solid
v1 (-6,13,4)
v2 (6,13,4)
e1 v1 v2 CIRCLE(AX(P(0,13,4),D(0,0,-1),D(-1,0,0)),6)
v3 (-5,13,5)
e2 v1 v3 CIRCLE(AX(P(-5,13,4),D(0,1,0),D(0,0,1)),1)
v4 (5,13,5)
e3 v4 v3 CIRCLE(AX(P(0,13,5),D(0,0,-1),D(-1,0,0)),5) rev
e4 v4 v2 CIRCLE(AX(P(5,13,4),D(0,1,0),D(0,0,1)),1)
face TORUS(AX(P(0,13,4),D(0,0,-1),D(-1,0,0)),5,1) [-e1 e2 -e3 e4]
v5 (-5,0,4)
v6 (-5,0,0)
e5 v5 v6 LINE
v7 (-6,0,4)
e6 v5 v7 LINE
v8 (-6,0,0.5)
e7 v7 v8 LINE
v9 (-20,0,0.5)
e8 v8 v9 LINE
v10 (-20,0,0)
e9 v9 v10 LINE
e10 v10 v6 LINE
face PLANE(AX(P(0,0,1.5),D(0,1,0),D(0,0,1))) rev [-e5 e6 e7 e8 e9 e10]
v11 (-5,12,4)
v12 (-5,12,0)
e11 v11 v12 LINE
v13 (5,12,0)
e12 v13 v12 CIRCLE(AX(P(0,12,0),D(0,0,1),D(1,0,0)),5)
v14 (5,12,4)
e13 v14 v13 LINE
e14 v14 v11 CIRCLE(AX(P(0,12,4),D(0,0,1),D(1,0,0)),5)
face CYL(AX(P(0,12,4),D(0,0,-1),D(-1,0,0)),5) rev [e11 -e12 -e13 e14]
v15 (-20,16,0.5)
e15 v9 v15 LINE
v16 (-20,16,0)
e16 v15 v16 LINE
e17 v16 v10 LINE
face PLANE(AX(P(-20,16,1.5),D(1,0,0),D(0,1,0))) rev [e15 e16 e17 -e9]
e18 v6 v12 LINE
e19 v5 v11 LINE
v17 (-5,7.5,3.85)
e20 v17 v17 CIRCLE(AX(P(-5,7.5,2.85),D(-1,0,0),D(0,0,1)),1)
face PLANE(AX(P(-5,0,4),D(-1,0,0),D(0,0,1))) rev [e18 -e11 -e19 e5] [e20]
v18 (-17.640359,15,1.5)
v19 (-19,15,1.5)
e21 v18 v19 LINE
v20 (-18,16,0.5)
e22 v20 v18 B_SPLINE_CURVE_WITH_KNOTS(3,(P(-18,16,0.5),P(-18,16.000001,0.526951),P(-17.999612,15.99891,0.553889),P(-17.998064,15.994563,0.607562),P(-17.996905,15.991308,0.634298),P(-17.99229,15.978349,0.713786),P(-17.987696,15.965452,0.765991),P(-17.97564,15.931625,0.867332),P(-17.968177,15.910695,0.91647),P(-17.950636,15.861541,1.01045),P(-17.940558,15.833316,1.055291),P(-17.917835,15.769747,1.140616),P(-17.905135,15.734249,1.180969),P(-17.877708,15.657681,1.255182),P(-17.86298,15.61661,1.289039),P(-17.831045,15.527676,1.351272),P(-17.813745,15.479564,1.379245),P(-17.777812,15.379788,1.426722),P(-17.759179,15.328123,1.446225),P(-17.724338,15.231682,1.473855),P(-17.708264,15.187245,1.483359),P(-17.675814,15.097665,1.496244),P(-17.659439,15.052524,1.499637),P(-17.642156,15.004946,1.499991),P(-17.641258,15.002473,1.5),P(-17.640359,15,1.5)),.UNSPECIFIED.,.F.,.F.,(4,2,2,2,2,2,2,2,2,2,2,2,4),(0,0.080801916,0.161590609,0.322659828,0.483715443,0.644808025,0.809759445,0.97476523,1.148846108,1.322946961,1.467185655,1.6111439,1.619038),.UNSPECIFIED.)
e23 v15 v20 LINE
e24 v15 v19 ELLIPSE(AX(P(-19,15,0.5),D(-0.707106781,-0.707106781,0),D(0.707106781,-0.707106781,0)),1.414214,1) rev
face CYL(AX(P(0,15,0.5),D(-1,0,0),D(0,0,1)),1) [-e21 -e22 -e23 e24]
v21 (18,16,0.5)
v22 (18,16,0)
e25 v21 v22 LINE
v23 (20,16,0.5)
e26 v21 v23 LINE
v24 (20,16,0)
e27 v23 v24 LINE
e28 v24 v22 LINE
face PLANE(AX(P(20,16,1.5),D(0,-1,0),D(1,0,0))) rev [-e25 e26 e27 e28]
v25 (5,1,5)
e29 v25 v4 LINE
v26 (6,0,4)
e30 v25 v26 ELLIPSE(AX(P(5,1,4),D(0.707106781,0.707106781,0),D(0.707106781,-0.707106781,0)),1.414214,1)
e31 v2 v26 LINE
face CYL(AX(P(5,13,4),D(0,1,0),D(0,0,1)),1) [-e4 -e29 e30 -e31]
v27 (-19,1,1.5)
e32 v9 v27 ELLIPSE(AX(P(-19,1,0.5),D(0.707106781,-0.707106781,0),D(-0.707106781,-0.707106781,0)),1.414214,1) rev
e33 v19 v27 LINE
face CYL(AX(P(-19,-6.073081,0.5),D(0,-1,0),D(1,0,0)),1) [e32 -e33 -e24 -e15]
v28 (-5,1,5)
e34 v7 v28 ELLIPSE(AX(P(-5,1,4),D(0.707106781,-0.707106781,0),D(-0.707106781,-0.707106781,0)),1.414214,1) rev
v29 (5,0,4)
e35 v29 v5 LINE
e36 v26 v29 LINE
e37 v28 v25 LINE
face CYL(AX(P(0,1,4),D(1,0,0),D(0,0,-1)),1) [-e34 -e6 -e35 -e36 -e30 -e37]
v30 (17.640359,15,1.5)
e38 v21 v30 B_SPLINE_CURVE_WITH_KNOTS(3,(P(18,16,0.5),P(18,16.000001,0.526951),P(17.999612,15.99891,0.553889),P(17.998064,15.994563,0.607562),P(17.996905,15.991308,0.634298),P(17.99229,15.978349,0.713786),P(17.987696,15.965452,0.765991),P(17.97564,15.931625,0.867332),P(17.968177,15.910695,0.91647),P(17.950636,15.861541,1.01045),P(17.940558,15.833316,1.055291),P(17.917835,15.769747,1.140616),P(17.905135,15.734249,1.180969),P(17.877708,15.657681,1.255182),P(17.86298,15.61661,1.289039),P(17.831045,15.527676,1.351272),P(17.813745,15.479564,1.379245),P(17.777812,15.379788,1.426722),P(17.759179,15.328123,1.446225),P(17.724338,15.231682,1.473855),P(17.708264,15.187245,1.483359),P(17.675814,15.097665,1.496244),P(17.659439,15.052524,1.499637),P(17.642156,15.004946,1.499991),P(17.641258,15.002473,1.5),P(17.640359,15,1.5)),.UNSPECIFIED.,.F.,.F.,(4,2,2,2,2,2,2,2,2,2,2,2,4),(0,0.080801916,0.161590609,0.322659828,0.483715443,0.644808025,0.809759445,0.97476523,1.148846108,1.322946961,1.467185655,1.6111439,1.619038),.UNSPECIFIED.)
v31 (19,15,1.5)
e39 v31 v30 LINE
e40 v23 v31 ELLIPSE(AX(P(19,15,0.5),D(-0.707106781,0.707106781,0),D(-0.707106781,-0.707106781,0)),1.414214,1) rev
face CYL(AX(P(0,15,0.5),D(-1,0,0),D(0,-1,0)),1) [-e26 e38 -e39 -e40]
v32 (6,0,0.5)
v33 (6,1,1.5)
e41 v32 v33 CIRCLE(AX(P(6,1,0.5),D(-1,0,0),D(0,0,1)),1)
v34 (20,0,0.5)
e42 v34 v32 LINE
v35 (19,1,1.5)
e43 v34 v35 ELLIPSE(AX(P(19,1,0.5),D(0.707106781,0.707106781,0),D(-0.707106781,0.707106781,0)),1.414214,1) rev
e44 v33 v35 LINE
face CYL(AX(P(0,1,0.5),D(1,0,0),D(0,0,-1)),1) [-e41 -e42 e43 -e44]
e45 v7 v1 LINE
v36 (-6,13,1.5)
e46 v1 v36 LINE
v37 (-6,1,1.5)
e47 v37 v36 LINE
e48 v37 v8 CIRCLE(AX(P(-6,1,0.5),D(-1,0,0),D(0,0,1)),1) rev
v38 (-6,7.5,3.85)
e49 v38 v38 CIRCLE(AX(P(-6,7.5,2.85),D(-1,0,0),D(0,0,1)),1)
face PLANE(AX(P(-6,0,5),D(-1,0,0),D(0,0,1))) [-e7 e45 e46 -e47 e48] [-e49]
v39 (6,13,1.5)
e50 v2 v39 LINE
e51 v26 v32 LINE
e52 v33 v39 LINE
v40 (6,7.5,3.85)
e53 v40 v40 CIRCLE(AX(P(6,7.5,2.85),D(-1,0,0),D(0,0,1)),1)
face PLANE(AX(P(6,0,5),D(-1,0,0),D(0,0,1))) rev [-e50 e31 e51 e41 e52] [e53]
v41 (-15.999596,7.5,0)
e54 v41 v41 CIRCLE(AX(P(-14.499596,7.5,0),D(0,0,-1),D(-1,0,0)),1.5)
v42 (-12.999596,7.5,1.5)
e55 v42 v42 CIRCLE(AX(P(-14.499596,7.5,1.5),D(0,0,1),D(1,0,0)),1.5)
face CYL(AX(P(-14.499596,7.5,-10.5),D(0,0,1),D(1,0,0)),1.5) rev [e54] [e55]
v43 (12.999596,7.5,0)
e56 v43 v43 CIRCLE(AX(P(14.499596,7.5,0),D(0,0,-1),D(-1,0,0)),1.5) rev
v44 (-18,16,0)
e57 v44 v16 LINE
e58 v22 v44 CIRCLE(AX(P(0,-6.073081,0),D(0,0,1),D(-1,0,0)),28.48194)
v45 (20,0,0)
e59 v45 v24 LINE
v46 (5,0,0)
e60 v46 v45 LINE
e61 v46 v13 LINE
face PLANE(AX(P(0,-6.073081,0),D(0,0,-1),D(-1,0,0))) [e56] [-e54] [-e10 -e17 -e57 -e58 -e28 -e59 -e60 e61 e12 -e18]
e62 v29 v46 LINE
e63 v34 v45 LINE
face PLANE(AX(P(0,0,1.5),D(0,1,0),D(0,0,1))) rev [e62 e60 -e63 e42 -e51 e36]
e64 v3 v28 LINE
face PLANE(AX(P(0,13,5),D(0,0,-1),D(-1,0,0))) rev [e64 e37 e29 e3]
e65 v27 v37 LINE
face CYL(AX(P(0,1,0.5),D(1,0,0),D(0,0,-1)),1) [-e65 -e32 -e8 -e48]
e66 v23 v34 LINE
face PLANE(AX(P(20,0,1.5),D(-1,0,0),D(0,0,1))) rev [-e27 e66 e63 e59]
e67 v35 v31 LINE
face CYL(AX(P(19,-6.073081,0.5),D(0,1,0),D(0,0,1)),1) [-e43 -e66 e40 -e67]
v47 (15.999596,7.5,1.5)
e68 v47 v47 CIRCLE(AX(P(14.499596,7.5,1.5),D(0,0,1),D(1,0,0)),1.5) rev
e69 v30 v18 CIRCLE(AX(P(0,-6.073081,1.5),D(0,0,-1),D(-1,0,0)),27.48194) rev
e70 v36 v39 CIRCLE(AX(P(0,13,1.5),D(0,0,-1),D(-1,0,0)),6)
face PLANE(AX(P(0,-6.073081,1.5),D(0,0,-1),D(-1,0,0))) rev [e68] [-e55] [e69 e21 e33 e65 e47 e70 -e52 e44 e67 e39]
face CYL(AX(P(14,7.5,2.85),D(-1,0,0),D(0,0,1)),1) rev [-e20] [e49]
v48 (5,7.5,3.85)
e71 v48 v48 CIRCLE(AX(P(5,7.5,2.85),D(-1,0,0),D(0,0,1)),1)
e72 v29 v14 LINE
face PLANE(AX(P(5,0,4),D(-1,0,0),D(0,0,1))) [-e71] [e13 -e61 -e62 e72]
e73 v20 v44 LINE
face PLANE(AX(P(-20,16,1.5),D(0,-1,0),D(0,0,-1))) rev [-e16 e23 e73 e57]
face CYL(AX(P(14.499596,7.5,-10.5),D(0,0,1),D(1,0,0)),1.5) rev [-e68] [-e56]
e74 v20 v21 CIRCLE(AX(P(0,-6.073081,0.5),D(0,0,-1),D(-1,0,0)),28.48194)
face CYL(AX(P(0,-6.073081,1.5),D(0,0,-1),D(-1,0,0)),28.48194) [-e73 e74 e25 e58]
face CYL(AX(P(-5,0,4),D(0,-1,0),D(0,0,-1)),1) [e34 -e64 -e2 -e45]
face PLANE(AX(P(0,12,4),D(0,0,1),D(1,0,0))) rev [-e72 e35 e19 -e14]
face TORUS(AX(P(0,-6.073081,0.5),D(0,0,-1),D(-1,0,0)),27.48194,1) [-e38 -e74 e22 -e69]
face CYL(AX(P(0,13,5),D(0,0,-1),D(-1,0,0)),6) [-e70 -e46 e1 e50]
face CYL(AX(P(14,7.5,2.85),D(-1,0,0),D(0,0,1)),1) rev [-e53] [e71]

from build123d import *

# Parameters (mm, degrees)
BOSS_EXTRUDE1_DEPTH = 1.5
BOSS_EXTRUDE2_DEPTH = 3.5
CUT_EXTRUDE1_DEPTH  = 4
FILLET1_R           = 1
FILLET4_R           = 1
SKETCH5_R           = 1.5
CUT_EXTRUDE3_DEPTH  = 12
SKETCH4_R           = 1
CUT_EXTRUDE5_DEPTH  = 20


with BuildPart() as part:
    # Sketch1 → Boss-Extrude1 (new body)
    with BuildSketch(Plane.XY):
        with BuildLine():
            Line((0, 0), (20, 0))
            Line((20, 0), (20, 16))
            Line((20, 16), (18, 16))
            ThreePointArc((18, 16), (0, 22.408858912), (-18, 16))
            Line((-18, 16), (-20, 16))
            Line((-20, 16), (-20, 0))
            Line((-20, 0), (0, 0))
        make_face()
    extrude(amount=BOSS_EXTRUDE1_DEPTH)

    # Sketch2 → Boss-Extrude2 (add)
    with BuildSketch(Plane.XY.offset(1.5)):
        with BuildLine():
            Line((6, 0), (6, 13))
            ThreePointArc((6, 13), (0, 19), (-6, 13))
            Line((-6, 13), (-6, 0))
            Line((-6, 0), (6, 0))
        make_face()
    extrude(amount=BOSS_EXTRUDE2_DEPTH)

    # Sketch3 → Cut-Extrude1 (cut)
    with BuildSketch(Plane(origin=(0, 0, 0), x_dir=(-1, 0, 0), z_dir=(0, 0, -1))):
        with BuildLine():
            Line((0, 0), (5, 0))
            Line((5, 0), (5, 12))
            ThreePointArc((5, 12), (0, 17), (-5, 12))
            Line((-5, 12), (-5, 0))
            Line((-5, 0), (0, 0))
        make_face()
    extrude(amount=-CUT_EXTRUDE1_DEPTH, mode=Mode.SUBTRACT)

    # Fillet1
    fillet1_edges = [part.edges().sort_by_distance(p)[0] for p in [
        (-6, 6.5, 5),
        (0, 19, 5),
        (0, 0, 5),
        (6, 6.5, 5),
    ]]
    fillet(fillet1_edges, radius=FILLET1_R - 0.0001)  # a hair under: the kernel refuses the full size

    # Fillet4
    fillet4_edges = [part.edges().sort_by_distance(p)[0] for p in [
        (20, 8, 1.5),
        (19, 16, 1.5),
        (0, 22.408858912, 1.5),
        (13, 0, 1.5),
        (-19, 16, 1.5),
        (-20, 8, 1.5),
        (-13, 0, 1.5),
    ]]
    fillet(fillet4_edges, radius=FILLET4_R)

    # Sketch5 → Cut-Extrude3 (cut)
    with BuildSketch(Plane.XY.offset(1.5)):
        with Locations((14.499595769, 7.5)):
            Circle(SKETCH5_R)
        with Locations((-14.499595769, 7.5)):
            Circle(SKETCH5_R)
    extrude(amount=-CUT_EXTRUDE3_DEPTH, mode=Mode.SUBTRACT)

    # Sketch4 → Cut-Extrude5 (cut)
    with BuildSketch(Plane.ZY.offset(6)):
        with Locations((2.85, 7.5)):
            Circle(SKETCH4_R)
    extrude(amount=-CUT_EXTRUDE5_DEPTH, mode=Mode.SUBTRACT)


solid = part.part
